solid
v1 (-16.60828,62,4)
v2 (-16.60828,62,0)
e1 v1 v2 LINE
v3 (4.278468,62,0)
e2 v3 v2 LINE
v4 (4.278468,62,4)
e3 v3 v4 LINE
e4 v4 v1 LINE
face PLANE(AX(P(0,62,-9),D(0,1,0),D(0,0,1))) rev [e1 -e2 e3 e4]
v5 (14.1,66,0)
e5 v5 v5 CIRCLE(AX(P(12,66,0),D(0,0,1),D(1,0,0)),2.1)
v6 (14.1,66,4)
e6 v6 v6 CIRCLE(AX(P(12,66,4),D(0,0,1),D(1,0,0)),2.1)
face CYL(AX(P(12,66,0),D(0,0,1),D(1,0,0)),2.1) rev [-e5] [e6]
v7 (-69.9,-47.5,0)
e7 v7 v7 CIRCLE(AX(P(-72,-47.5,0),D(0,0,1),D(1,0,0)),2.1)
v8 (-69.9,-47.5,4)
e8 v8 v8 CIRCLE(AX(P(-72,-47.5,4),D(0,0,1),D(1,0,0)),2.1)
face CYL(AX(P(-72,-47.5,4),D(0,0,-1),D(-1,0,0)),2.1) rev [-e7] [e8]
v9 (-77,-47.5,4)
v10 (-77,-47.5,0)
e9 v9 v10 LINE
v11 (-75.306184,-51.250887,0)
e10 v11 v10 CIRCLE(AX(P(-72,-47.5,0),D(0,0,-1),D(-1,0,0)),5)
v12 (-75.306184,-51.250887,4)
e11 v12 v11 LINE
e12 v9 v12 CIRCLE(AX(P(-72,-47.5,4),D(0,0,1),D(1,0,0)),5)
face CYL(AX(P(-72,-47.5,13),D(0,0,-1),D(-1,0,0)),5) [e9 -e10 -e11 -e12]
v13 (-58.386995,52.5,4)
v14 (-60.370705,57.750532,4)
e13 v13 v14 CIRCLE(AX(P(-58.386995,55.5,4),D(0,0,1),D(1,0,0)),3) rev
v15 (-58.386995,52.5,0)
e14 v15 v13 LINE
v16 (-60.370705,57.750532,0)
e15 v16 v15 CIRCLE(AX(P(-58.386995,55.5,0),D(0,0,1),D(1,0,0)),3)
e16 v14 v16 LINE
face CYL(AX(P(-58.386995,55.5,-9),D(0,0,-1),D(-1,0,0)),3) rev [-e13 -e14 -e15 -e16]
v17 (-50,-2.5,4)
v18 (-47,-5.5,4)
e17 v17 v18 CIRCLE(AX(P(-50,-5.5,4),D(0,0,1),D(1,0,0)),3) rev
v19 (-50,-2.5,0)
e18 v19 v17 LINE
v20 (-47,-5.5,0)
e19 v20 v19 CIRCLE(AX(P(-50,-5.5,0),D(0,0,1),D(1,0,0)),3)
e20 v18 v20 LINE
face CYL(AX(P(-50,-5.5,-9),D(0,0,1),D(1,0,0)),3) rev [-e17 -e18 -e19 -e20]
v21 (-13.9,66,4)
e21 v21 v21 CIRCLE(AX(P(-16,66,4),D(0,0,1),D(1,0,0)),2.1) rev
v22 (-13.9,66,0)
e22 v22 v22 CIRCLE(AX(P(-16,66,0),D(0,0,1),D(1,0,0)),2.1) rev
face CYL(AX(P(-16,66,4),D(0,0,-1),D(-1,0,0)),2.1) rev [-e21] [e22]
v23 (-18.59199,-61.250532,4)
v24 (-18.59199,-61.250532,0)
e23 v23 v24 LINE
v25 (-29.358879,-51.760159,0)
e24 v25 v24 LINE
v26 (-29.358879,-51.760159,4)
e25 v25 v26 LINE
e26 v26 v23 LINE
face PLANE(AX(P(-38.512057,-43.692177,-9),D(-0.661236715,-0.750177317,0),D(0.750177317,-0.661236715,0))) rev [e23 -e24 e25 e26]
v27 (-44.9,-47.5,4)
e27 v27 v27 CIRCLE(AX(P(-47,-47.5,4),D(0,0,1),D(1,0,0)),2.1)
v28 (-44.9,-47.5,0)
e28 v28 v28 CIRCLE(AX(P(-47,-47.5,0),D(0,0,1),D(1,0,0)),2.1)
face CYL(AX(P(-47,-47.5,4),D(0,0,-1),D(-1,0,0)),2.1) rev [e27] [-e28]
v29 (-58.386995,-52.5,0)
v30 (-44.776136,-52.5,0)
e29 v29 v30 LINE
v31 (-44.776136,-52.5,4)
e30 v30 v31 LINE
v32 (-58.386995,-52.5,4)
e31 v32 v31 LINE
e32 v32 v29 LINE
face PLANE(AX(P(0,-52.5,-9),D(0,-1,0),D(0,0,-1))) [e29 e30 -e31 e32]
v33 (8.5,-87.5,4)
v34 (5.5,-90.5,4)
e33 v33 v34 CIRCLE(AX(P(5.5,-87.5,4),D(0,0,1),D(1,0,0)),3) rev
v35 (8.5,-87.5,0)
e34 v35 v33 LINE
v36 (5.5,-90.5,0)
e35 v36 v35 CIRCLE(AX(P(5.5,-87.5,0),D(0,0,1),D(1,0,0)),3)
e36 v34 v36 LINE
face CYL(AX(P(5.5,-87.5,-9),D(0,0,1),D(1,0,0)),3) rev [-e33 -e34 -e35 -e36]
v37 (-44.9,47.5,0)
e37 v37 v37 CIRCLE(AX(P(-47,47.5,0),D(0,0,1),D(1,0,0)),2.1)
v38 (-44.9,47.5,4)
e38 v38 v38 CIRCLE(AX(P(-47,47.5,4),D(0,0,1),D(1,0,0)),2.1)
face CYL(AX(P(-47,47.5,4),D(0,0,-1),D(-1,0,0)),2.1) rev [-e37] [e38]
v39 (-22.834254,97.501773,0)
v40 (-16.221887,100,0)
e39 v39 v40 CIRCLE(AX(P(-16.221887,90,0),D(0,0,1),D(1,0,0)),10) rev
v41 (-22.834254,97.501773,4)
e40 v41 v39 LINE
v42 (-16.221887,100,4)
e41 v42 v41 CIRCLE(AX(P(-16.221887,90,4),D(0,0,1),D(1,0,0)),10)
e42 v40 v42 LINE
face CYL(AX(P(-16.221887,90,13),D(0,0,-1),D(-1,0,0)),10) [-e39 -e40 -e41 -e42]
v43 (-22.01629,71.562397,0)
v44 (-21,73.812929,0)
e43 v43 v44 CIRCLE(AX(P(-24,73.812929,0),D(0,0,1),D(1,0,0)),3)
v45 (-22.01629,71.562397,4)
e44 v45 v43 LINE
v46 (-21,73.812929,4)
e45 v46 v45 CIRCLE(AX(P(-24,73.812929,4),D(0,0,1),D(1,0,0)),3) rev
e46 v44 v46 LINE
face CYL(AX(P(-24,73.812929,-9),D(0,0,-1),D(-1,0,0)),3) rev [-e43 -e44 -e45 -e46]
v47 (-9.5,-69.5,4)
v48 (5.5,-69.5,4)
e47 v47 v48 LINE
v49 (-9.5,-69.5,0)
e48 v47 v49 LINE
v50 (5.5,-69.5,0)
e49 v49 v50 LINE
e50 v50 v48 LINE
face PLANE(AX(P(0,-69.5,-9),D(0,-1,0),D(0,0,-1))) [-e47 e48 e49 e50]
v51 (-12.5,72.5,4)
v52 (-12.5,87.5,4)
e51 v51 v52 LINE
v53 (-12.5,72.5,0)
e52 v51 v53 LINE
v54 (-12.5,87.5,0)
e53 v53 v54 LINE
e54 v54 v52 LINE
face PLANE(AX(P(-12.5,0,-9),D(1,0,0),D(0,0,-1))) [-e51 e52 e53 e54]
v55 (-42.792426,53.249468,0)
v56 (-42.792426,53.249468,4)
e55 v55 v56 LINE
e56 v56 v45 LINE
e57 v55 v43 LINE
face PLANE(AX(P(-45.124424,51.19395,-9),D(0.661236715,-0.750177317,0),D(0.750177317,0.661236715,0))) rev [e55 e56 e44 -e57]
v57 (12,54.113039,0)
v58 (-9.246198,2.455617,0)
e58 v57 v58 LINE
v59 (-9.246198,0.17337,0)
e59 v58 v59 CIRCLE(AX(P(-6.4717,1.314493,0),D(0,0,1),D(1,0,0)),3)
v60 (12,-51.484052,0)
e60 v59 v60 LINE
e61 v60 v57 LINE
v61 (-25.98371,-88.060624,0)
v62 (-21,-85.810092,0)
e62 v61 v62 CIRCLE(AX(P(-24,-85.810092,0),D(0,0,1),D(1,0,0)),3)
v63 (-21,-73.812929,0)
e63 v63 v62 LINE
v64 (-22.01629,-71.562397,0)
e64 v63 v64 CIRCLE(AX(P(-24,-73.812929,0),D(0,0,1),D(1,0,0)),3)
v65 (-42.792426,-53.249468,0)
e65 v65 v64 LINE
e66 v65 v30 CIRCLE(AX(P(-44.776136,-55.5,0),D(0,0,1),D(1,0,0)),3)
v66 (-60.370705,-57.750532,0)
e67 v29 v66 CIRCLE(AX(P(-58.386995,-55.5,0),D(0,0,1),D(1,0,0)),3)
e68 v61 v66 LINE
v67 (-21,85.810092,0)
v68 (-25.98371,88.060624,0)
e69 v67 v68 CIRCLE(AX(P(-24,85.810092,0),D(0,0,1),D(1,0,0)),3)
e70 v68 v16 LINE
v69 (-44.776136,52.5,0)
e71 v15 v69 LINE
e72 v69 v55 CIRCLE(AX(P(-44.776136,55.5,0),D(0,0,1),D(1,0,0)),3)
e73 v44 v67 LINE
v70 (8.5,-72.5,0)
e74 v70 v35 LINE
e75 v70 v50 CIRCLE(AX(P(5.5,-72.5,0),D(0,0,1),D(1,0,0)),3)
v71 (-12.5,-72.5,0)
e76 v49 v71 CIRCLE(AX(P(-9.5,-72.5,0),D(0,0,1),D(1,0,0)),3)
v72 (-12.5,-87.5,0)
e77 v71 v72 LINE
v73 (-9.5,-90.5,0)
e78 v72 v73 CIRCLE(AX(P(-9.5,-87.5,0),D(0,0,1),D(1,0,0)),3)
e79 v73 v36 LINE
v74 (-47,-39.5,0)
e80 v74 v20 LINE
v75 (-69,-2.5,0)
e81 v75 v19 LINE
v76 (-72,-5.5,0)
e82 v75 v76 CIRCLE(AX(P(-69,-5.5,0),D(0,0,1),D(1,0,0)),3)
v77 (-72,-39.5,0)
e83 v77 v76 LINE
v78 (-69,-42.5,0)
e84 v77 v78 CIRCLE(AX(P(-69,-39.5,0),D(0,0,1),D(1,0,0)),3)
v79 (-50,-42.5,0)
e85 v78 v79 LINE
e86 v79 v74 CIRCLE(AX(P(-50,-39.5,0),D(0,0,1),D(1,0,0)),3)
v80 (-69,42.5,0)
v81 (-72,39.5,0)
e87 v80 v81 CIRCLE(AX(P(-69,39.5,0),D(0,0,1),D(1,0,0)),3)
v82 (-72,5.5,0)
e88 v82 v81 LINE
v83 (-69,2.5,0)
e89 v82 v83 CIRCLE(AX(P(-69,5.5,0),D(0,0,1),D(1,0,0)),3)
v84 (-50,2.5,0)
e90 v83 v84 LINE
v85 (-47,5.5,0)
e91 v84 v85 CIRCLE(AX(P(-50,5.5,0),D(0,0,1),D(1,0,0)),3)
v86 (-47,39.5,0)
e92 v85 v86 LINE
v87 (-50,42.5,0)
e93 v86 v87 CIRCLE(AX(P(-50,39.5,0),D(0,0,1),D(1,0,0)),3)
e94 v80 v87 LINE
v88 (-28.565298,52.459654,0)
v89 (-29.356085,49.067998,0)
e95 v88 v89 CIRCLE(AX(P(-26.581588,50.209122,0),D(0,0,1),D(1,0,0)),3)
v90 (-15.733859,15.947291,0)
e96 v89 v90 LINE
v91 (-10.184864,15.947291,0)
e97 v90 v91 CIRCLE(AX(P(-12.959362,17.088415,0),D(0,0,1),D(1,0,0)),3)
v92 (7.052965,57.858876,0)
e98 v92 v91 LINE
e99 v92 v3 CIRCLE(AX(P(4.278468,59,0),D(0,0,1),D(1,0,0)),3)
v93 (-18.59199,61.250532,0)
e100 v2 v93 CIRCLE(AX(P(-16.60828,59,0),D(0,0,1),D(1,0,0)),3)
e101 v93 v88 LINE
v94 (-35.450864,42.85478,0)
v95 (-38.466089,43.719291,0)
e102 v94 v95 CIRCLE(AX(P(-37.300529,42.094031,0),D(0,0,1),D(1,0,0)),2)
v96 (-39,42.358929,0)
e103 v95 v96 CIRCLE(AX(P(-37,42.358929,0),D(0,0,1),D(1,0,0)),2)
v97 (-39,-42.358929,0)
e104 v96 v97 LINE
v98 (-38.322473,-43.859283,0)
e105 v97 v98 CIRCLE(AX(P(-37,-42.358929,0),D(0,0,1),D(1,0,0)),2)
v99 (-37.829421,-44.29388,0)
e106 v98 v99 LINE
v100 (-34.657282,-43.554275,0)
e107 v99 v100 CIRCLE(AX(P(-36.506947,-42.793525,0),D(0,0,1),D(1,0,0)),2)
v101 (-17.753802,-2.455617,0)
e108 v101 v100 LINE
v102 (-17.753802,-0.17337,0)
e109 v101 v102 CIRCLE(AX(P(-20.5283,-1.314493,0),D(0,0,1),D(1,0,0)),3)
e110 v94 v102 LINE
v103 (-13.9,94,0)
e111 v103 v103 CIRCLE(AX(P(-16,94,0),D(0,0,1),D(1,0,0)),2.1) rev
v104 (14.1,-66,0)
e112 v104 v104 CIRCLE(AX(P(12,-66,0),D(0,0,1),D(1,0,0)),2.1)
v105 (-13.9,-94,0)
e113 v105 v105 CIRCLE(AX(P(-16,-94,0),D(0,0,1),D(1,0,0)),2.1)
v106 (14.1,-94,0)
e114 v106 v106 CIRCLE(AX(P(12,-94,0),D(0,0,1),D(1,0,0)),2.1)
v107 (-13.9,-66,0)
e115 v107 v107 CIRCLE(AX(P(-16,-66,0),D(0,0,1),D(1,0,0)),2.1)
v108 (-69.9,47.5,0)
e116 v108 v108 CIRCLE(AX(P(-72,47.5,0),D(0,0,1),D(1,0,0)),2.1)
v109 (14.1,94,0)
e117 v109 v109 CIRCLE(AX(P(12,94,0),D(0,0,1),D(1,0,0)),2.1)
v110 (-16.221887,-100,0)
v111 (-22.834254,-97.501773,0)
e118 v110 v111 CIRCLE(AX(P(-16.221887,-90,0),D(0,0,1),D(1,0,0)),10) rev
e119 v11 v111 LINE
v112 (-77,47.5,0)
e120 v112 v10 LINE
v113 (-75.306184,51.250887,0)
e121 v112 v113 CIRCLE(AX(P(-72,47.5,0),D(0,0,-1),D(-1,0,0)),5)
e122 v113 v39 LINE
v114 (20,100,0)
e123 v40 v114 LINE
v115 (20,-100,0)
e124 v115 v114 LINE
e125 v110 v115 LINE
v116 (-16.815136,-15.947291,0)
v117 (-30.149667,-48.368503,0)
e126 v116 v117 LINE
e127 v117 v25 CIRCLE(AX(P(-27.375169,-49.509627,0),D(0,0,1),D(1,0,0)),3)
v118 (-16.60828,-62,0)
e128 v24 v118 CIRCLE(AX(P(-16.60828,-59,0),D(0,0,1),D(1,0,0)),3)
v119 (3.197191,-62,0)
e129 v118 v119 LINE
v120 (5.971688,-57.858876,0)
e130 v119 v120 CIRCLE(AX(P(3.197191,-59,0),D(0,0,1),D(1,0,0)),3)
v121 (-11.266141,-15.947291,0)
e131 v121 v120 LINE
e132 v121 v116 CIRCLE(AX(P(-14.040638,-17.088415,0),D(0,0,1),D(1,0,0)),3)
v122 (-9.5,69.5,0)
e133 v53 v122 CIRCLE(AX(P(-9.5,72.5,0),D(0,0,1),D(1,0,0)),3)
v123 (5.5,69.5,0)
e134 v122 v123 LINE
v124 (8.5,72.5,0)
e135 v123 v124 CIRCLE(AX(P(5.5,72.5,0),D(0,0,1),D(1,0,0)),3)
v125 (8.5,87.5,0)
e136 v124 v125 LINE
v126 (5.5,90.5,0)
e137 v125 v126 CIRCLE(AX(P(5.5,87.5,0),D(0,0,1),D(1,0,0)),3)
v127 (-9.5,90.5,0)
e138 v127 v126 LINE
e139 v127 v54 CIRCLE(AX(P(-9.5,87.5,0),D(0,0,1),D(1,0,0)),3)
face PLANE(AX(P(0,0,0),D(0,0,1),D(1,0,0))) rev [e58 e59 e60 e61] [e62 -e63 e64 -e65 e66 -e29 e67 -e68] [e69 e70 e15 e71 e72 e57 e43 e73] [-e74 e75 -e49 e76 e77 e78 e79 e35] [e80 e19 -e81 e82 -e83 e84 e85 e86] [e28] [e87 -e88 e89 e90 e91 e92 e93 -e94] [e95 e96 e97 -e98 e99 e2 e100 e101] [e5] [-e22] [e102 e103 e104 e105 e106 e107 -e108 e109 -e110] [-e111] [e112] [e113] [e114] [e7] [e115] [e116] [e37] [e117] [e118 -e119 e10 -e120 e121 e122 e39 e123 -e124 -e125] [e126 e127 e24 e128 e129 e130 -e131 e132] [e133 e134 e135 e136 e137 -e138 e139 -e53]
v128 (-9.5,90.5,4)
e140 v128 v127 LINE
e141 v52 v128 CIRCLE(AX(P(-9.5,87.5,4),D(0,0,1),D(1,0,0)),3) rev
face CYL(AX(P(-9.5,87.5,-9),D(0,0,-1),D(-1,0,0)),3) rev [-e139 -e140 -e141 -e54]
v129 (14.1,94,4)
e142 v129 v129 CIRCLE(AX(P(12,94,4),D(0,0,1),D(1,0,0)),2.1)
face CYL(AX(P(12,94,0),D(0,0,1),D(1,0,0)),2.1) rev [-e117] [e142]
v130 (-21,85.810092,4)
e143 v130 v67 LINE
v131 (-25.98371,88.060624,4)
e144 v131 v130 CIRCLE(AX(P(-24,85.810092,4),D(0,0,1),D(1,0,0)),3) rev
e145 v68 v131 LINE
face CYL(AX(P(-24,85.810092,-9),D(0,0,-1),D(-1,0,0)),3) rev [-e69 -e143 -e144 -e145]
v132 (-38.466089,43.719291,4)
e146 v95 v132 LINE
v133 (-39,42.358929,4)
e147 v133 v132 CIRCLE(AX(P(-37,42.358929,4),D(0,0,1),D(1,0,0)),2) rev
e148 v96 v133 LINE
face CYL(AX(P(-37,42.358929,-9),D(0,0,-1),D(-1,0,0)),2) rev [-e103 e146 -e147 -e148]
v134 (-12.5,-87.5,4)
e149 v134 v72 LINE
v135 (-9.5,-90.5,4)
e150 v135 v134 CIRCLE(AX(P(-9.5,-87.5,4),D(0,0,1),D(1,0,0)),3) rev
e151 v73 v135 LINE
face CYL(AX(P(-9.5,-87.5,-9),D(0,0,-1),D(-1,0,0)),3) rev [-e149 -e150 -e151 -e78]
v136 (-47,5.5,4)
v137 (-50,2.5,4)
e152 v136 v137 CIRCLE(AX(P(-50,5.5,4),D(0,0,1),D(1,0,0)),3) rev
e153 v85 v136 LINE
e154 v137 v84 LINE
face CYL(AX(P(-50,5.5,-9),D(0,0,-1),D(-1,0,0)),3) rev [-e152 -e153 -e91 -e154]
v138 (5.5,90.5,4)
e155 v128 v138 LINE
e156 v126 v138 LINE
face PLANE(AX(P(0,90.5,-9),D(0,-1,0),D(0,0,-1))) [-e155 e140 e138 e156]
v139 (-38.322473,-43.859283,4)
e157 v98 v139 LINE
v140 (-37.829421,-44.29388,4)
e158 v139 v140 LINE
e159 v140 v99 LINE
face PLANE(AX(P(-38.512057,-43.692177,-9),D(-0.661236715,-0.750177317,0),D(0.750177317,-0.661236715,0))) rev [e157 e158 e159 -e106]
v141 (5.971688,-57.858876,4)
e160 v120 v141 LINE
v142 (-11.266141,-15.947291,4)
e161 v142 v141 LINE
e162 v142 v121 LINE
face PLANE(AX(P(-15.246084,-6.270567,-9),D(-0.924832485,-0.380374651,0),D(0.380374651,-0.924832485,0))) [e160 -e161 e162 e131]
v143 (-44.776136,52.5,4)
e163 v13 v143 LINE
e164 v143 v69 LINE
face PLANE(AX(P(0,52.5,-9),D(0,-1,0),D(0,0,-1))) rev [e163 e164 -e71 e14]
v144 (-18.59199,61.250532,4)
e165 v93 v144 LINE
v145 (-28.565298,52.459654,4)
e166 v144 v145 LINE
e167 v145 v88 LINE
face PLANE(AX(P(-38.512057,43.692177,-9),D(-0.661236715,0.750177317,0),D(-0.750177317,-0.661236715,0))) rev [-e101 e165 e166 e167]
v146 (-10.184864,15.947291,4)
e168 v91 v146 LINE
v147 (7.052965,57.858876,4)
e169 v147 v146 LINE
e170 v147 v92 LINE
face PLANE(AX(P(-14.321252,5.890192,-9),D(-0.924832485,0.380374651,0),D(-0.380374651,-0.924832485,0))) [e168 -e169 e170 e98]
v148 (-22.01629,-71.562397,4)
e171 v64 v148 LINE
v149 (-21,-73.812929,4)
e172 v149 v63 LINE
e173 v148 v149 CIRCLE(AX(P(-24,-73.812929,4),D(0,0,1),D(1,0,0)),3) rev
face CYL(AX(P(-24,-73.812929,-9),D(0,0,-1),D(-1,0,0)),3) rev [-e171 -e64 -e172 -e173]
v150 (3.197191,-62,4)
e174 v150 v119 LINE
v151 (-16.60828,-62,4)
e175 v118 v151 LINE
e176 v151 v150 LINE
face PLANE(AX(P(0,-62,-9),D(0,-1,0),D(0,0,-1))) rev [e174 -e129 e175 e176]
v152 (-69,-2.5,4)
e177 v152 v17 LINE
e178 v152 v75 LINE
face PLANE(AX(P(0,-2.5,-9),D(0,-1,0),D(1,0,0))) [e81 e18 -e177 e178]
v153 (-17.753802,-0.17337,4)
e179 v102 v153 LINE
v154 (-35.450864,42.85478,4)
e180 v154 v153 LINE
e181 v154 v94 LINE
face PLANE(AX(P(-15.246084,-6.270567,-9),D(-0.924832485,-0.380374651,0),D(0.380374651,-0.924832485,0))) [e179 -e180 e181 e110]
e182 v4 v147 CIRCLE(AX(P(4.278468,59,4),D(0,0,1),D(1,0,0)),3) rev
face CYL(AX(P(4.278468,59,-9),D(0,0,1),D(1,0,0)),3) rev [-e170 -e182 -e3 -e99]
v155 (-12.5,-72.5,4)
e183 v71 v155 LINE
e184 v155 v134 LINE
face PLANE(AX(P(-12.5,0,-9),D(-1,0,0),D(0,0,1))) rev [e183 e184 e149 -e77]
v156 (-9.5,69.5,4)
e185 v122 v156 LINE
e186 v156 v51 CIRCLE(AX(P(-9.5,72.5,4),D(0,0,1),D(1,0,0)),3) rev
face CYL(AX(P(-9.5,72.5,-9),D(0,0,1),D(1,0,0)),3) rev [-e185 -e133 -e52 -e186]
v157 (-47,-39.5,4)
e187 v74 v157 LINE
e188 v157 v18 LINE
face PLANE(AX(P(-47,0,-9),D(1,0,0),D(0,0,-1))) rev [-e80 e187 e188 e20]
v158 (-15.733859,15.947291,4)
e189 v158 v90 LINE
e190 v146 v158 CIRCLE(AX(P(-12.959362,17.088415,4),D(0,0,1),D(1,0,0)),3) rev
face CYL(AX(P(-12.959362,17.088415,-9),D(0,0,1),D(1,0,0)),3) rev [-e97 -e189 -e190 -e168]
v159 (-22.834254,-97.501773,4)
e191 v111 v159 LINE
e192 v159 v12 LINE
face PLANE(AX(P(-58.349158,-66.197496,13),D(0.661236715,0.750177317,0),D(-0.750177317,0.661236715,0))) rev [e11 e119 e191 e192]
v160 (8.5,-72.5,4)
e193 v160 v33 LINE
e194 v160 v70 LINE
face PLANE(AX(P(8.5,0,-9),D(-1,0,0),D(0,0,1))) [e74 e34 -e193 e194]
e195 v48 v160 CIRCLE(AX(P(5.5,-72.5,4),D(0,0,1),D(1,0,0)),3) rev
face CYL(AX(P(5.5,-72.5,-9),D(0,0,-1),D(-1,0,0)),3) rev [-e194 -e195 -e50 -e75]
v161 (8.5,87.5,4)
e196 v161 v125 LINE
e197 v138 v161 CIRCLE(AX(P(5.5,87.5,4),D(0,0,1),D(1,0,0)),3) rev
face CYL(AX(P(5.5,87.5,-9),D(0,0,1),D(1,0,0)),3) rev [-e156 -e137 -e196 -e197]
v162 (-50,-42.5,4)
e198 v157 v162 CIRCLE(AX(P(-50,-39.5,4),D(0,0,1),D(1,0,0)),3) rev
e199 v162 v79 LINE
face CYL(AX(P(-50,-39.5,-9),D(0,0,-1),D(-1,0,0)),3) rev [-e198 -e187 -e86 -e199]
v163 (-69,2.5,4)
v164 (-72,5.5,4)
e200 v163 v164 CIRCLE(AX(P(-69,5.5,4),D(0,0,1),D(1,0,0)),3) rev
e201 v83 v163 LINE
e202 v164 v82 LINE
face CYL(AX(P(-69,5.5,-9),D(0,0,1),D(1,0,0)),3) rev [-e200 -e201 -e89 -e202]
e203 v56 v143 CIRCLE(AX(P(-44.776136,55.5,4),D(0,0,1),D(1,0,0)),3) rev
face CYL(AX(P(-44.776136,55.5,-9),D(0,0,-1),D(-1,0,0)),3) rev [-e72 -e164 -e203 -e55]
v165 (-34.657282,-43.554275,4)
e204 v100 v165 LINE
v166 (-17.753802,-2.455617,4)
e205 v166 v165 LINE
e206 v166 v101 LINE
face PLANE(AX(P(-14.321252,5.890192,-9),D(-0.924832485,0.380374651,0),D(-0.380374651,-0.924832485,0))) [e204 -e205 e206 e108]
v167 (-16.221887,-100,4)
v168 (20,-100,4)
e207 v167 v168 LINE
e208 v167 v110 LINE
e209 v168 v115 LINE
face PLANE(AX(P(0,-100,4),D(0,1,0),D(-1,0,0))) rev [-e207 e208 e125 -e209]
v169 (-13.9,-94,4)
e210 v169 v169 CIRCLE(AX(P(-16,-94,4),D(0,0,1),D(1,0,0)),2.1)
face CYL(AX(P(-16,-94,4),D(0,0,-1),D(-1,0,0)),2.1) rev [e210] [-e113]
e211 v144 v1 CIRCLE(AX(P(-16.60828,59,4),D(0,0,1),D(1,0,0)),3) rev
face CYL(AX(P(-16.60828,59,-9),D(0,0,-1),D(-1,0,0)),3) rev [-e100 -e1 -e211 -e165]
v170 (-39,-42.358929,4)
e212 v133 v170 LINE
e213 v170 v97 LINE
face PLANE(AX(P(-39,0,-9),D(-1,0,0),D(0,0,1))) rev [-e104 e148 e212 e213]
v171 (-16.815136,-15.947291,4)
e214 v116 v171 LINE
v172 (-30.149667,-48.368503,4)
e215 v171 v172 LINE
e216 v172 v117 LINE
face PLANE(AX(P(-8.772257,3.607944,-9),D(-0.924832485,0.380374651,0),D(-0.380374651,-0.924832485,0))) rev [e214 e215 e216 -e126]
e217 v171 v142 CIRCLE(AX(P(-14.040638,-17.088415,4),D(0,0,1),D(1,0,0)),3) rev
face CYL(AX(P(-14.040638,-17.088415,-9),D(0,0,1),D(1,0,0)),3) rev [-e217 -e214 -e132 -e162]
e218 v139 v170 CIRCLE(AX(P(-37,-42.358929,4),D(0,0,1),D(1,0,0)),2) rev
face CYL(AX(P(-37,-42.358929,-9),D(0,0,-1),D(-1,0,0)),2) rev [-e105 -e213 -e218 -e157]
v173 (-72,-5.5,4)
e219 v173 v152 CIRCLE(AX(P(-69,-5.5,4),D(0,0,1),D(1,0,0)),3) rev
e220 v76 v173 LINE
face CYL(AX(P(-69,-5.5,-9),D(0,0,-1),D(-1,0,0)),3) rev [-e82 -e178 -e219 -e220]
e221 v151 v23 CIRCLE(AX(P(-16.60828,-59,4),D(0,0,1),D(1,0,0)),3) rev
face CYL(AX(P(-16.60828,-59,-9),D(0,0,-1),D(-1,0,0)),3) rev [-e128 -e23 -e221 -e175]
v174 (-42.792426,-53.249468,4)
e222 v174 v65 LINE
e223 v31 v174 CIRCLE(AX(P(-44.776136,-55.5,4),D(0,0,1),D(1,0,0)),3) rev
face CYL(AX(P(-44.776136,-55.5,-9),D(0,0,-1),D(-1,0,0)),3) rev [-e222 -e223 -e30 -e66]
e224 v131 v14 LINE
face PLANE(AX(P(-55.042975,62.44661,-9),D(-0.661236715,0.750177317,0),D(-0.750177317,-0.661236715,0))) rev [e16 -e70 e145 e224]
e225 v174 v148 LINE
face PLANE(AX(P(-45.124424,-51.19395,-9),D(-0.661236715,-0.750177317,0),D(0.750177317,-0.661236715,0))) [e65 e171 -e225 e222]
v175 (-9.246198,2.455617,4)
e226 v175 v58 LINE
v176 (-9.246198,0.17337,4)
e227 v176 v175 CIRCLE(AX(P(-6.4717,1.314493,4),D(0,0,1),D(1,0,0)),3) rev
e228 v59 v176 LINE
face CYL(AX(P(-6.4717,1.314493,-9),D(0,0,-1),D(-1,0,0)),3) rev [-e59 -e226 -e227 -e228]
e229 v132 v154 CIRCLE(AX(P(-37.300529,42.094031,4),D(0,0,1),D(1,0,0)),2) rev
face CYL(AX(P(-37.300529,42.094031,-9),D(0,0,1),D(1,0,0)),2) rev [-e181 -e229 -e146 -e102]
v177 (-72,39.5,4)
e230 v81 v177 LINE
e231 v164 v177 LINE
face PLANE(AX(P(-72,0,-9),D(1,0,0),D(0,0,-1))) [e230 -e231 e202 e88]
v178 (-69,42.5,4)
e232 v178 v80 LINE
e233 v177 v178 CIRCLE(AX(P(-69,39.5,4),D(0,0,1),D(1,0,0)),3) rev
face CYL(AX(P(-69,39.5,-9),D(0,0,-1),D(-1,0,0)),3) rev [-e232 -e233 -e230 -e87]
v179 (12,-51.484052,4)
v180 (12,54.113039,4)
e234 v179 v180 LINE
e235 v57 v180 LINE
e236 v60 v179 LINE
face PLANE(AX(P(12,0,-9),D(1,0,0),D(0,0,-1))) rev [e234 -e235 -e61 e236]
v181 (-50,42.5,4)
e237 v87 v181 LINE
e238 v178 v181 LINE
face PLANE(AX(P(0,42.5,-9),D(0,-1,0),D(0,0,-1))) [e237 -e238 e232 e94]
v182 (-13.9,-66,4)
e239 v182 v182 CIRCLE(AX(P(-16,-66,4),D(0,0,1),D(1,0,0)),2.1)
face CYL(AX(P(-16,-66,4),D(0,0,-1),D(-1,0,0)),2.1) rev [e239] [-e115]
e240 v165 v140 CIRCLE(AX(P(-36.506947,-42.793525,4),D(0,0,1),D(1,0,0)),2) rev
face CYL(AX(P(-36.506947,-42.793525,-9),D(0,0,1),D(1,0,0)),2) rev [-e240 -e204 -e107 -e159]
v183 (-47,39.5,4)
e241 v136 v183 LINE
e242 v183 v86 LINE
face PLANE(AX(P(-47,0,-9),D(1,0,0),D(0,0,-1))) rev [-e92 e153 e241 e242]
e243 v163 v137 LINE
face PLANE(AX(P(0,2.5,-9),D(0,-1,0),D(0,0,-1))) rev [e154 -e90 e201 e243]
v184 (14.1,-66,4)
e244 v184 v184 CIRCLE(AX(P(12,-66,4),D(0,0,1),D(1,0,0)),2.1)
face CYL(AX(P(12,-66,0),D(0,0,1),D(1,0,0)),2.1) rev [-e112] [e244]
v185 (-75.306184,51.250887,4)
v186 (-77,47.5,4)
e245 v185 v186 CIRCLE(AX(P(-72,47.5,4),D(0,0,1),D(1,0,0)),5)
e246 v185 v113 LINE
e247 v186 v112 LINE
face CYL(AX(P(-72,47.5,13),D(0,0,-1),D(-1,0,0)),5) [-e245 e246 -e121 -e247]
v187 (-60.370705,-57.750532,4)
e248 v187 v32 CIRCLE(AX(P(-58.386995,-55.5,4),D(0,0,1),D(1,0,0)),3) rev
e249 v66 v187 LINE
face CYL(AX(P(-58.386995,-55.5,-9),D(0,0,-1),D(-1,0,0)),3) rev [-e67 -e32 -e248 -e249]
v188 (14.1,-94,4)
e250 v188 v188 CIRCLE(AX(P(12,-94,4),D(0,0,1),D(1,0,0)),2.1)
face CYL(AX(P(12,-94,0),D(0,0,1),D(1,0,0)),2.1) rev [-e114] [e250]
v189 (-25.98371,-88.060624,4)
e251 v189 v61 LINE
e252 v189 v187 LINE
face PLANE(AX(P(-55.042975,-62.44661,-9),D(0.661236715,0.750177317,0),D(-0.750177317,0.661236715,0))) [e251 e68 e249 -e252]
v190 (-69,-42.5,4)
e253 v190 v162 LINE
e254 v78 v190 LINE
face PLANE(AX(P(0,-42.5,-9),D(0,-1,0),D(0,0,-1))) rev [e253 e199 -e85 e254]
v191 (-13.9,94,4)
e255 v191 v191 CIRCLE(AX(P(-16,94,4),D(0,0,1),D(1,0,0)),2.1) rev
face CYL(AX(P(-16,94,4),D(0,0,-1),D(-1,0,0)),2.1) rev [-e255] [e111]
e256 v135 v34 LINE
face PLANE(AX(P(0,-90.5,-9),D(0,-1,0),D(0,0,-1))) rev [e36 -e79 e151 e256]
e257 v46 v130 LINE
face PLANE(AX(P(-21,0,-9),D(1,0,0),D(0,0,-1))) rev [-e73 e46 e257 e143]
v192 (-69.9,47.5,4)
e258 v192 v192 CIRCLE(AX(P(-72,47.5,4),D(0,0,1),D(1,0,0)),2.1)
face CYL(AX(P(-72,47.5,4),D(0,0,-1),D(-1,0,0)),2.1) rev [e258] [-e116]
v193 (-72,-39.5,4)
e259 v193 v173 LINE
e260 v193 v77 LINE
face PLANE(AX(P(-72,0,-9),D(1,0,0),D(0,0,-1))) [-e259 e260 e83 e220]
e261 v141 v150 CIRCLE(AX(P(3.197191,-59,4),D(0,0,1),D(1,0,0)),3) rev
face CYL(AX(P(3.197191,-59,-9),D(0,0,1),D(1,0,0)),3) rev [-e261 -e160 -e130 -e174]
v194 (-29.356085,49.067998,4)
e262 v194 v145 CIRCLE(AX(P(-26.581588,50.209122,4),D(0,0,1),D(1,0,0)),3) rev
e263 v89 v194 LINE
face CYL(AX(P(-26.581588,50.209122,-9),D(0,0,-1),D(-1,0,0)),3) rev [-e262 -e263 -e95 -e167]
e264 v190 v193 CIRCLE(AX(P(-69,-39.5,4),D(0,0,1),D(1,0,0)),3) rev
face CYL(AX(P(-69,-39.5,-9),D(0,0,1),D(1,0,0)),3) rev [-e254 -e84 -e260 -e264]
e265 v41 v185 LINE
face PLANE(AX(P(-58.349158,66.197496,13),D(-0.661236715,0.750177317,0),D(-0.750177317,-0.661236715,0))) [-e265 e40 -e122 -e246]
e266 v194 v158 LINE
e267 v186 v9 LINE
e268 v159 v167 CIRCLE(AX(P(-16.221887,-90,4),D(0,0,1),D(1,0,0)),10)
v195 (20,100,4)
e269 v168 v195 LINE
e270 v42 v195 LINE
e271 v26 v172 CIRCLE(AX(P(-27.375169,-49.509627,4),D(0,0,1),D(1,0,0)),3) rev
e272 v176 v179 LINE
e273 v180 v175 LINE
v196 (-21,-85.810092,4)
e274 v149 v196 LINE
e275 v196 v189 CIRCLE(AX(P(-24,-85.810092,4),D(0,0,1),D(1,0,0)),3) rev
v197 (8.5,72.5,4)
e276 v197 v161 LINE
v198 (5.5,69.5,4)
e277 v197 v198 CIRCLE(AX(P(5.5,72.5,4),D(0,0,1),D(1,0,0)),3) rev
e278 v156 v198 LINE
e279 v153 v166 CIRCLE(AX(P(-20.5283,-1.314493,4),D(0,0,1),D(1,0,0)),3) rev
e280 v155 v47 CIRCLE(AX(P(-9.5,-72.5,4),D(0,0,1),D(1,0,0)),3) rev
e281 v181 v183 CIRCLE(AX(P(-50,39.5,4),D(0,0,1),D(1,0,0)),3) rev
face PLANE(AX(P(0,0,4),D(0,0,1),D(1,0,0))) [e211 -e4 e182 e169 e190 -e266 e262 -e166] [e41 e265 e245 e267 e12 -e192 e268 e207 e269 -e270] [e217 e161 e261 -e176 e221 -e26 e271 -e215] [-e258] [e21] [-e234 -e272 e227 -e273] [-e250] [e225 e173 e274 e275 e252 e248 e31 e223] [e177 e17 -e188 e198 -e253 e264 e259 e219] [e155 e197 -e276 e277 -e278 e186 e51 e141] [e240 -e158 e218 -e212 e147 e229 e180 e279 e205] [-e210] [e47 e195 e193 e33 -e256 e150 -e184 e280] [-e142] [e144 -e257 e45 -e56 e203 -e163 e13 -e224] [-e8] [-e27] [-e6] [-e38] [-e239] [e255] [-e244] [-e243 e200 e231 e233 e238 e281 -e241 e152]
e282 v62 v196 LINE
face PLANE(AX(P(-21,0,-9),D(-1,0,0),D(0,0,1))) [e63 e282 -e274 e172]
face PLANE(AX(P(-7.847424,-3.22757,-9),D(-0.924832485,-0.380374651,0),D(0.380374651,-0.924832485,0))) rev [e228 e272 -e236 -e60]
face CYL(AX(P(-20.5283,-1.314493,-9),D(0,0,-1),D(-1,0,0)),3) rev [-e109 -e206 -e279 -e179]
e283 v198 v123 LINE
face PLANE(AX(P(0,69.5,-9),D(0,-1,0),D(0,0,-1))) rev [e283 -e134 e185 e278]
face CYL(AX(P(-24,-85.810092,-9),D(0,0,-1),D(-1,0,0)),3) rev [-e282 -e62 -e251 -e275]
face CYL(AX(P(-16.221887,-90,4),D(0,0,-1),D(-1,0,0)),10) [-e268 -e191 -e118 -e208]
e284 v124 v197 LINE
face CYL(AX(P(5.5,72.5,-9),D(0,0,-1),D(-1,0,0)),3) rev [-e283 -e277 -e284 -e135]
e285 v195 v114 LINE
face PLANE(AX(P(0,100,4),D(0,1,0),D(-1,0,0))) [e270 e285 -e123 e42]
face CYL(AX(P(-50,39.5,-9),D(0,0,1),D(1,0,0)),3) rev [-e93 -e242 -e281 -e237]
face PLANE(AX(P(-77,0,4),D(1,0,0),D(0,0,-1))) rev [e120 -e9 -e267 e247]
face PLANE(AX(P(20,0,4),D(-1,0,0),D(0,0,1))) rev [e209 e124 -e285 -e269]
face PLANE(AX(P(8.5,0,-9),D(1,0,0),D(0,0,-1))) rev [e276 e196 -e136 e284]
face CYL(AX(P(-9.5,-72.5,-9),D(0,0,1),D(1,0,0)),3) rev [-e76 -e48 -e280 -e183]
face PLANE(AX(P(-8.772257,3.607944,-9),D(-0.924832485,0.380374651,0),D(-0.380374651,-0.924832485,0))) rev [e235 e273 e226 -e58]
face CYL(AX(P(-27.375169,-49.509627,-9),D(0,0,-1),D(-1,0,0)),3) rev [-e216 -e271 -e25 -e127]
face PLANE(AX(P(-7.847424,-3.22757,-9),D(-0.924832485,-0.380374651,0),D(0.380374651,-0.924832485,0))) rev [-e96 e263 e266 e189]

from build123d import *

# Parameters (mm, degrees)
SKETCH_1_R          = 2.1
EXTRUDE_1_DEPTH     = 4
CUT_EXTRUDE_2_DEPTH = 13
SKETCH_8_R          = 2.1
CUT_EXTRUDE_3_DEPTH = 4
SKETCH_9_W          = 4
SKETCH_9_H          = 200
EXTRUDE_4_DEPTH     = 4
FILLET_2_R          = 10
SKETCH_10_W         = 25
SKETCH_10_H         = 40
SKETCH_10_W_2       = 21
SKETCH_10_H_2       = 21
CUT_EXTRUDE_5_DEPTH = 13
FILLET_3_R          = 2
FILLET_4_R          = 3


with BuildPart() as part:
    # 草图1 → 凸台-拉伸1 (new body)
    with BuildSketch(Plane.XY):
        Polygon((-20, 100), (-77, 55), (-77, -55), (-20, -100), (20, -100), (20, 100), align=None)
        with Locations((-72, 47.5)):
            Circle(SKETCH_1_R, mode=Mode.SUBTRACT)
        with Locations((-47, 47.5)):
            Circle(SKETCH_1_R, mode=Mode.SUBTRACT)
        with Locations((-72, -47.5)):
            Circle(SKETCH_1_R, mode=Mode.SUBTRACT)
        with Locations((-47, -47.5)):
            Circle(SKETCH_1_R, mode=Mode.SUBTRACT)
        with Locations((-16, -66)):
            Circle(SKETCH_1_R, mode=Mode.SUBTRACT)
        with Locations((-16, -94)):
            Circle(SKETCH_1_R, mode=Mode.SUBTRACT)
        with Locations((-16, 94)):
            Circle(SKETCH_1_R, mode=Mode.SUBTRACT)
        with Locations((-16, 66)):
            Circle(SKETCH_1_R, mode=Mode.SUBTRACT)
    extrude(amount=EXTRUDE_1_DEPTH)

    # 草图6 → 切除-拉伸2 (cut)
    with BuildSketch(Plane(origin=(0, 0, 0), x_dir=(-1, 0, 0), z_dir=(0, 0, -1))):
        with BuildLine():
            Line((20, 100), (75.306183573, 51.250886586))
            ThreePointArc((75.306183573, 51.250886586), (76.556913312, 49.557800055), (77, 47.5))
            Line((77, 47.5), (77, 55))
            Line((77, 55), (20, 100))
        make_face()
        with BuildLine():
            Line((77, -55), (77, -47.5))
            ThreePointArc((77, -47.5), (76.556913312, -49.557800055), (75.306183573, -51.250886586))
            Line((75.306183573, -51.250886586), (20, -100))
            Line((20, -100), (77, -55))
        make_face()
    extrude(amount=-CUT_EXTRUDE_2_DEPTH, mode=Mode.SUBTRACT)

    # 草图8 → 切除-拉伸3 (cut)
    with BuildSketch(Plane.XY.offset(4)):
        with Locations((12, 94)):
            Circle(SKETCH_8_R)
        with Locations((12, 66)):
            Circle(SKETCH_8_R)
        with Locations((12, -66)):
            Circle(SKETCH_8_R)
        with Locations((12, -94)):
            Circle(SKETCH_8_R)
    extrude(amount=-CUT_EXTRUDE_3_DEPTH, mode=Mode.SUBTRACT)

    # 草图9 → 凸台-拉伸4 (add)
    with BuildSketch(Plane.XY.offset(4)):
        with Locations((18, 0)):
            Rectangle(SKETCH_9_W, SKETCH_9_H)
    extrude(amount=-EXTRUDE_4_DEPTH)

    # 圆角2
    fillet_2_edges = [part.edges().sort_by_distance(p)[0] for p in [
        (-20, 100, 2),
        (-20, -100, 2),
    ]]
    fillet(fillet_2_edges, radius=FILLET_2_R)

    # 草图10 → 切除-拉伸5 (cut)
    with BuildSketch(Plane.XY.offset(4)):
        Polygon((8.756169307, 62), (-17.741713503, 62), (-30.169479576, 51.045662914), (-12.959361551, 9.201454384), align=None)
        Polygon((-17.284469142, -1.314493483), (-36.518131022, 45.449704029), (-39, 43.262084048), (-39, -43.262084048), (-35.724549591, -46.14919889), align=None)
        Polygon((12, 54.113039099), (-9.715530858, 1.314493483), (12, -51.484052132), align=None)
        Polygon((7.674892409, -62), (-14.040638449, -9.201454384), (-30.963061007, -50.346168054), (-17.741713503, -62), align=None)
        with Locations((-59.5, -22.5)):
            Rectangle(SKETCH_10_W, SKETCH_10_H)
        with Locations((-59.5, 22.5)):
            Rectangle(SKETCH_10_W, SKETCH_10_H)
        Polygon((-43.642701965, 52.5), (-21, 72.458195897), (-21, 92.453468554), (-66.327467753, 52.5), align=None)
        with Locations((-2, 80)):
            Rectangle(SKETCH_10_W_2, SKETCH_10_H_2)
        Polygon((-21, -72.458195897), (-21, -92.453468554), (-66.327467753, -52.5), (-43.642701965, -52.5), align=None)
        with Locations((-2, -80)):
            Rectangle(SKETCH_10_W_2, SKETCH_10_H_2)
    extrude(amount=-CUT_EXTRUDE_5_DEPTH, mode=Mode.SUBTRACT)

    # 圆角3
    # the kernel refuses this fillet: 2 mm, written as the material it adds along each edge
    with BuildSketch(Plane(origin=(-35.724549591, -46.14919889, 4), x_dir=(0.3803746509932158, 0.9248324847678034, 0), z_dir=(0, 0, -1))) as fillet_3_piece_1:
        with BuildLine():
            CenterArc((FILLET_3_R * 1.4029157826, -FILLET_3_R), FILLET_3_R, 90, 109.037368678)
            Line((FILLET_3_R * 0.457609745735, -FILLET_3_R * 1.3261847585), (0, 0))
            Line((0, 0), (FILLET_3_R * 1.4029157826, 0))
        make_face()
    extrude(amount=4)
    with BuildSketch(Plane(origin=(-39, -43.262084048, 4), x_dir=(0, 1, 0), z_dir=(0, 0, -1)), Plane(origin=(-39, 43.262084048, 4), x_dir=(0.7501773172639279, 0.6612367145453253, 0), z_dir=(0, 0, -1))) as fillet_3_piece_2:
        with BuildLine():
            CenterArc((FILLET_3_R * 0.451577617263, FILLET_3_R), FILLET_3_R, 221.394260007, 48.605739993)
            Line((-FILLET_3_R * 0.298599700001, FILLET_3_R * 0.338763285455), (0, 0))
            Line((0, 0), (FILLET_3_R * 0.451577617263, 0))
        make_face()
    extrude(amount=4)
    with BuildSketch(Plane(origin=(-36.518131022, 45.449704029, 4), x_dir=(0.3803746509932163, -0.9248324847678032, 0), z_dir=(0, 0, -1))) as fillet_3_piece_3:
        with BuildLine():
            CenterArc((FILLET_3_R * 1.4029157826, FILLET_3_R), FILLET_3_R, 160.962631322, 109.037368678)
            Line((FILLET_3_R * 0.457609745735, FILLET_3_R * 1.3261847585), (0, 0))
            Line((0, 0), (FILLET_3_R * 1.4029157826, 0))
        make_face()
    extrude(amount=4)

    # 圆角4
    fillet_4_edges = [part.edges().sort_by_distance(p)[0] for p in [
        (-47, 2.5, 2),
        (-72, 2.5, 2),
        (-72, 42.5, 2),
        (-47, 42.5, 2),
        (-21, 72.458195897, 2),
        (-43.642701965, 52.5, 2),
        (-66.327467753, 52.5, 2),
        (-21, 92.453468554, 2),
        (8.5, 69.5, 2),
        (-12.5, 69.5, 2),
        (-12.5, 90.5, 2),
        (8.5, 90.5, 2),
        (-21, -72.458195897, 2),
        (-21, -92.453468554, 2),
        (-66.327467753, -52.5, 2),
        (-43.642701965, -52.5, 2),
        (-17.284469142, -1.314493483, 2),
        (-9.715530858, 1.314493483, 2),
        (-14.040638449, -9.201454384, 2),
        (7.674892409, -62, 2),
        (-17.741713503, -62, 2),
        (-30.963061007, -50.346168054, 2),
        (-47, -42.5, 2),
        (-72, -42.5, 2),
        (-72, -2.5, 2),
        (-47, -2.5, 2),
        (-12.5, -69.5, 2),
        (8.5, -69.5, 2),
        (8.5, -90.5, 2),
        (-12.5, -90.5, 2),
        (8.756169307, 62, 2),
        (-12.959361551, 9.201454384, 2),
        (-30.169479576, 51.045662914, 2),
        (-17.741713503, 62, 2),
    ]]
    fillet(fillet_4_edges, radius=FILLET_4_R)


solid = part.part
